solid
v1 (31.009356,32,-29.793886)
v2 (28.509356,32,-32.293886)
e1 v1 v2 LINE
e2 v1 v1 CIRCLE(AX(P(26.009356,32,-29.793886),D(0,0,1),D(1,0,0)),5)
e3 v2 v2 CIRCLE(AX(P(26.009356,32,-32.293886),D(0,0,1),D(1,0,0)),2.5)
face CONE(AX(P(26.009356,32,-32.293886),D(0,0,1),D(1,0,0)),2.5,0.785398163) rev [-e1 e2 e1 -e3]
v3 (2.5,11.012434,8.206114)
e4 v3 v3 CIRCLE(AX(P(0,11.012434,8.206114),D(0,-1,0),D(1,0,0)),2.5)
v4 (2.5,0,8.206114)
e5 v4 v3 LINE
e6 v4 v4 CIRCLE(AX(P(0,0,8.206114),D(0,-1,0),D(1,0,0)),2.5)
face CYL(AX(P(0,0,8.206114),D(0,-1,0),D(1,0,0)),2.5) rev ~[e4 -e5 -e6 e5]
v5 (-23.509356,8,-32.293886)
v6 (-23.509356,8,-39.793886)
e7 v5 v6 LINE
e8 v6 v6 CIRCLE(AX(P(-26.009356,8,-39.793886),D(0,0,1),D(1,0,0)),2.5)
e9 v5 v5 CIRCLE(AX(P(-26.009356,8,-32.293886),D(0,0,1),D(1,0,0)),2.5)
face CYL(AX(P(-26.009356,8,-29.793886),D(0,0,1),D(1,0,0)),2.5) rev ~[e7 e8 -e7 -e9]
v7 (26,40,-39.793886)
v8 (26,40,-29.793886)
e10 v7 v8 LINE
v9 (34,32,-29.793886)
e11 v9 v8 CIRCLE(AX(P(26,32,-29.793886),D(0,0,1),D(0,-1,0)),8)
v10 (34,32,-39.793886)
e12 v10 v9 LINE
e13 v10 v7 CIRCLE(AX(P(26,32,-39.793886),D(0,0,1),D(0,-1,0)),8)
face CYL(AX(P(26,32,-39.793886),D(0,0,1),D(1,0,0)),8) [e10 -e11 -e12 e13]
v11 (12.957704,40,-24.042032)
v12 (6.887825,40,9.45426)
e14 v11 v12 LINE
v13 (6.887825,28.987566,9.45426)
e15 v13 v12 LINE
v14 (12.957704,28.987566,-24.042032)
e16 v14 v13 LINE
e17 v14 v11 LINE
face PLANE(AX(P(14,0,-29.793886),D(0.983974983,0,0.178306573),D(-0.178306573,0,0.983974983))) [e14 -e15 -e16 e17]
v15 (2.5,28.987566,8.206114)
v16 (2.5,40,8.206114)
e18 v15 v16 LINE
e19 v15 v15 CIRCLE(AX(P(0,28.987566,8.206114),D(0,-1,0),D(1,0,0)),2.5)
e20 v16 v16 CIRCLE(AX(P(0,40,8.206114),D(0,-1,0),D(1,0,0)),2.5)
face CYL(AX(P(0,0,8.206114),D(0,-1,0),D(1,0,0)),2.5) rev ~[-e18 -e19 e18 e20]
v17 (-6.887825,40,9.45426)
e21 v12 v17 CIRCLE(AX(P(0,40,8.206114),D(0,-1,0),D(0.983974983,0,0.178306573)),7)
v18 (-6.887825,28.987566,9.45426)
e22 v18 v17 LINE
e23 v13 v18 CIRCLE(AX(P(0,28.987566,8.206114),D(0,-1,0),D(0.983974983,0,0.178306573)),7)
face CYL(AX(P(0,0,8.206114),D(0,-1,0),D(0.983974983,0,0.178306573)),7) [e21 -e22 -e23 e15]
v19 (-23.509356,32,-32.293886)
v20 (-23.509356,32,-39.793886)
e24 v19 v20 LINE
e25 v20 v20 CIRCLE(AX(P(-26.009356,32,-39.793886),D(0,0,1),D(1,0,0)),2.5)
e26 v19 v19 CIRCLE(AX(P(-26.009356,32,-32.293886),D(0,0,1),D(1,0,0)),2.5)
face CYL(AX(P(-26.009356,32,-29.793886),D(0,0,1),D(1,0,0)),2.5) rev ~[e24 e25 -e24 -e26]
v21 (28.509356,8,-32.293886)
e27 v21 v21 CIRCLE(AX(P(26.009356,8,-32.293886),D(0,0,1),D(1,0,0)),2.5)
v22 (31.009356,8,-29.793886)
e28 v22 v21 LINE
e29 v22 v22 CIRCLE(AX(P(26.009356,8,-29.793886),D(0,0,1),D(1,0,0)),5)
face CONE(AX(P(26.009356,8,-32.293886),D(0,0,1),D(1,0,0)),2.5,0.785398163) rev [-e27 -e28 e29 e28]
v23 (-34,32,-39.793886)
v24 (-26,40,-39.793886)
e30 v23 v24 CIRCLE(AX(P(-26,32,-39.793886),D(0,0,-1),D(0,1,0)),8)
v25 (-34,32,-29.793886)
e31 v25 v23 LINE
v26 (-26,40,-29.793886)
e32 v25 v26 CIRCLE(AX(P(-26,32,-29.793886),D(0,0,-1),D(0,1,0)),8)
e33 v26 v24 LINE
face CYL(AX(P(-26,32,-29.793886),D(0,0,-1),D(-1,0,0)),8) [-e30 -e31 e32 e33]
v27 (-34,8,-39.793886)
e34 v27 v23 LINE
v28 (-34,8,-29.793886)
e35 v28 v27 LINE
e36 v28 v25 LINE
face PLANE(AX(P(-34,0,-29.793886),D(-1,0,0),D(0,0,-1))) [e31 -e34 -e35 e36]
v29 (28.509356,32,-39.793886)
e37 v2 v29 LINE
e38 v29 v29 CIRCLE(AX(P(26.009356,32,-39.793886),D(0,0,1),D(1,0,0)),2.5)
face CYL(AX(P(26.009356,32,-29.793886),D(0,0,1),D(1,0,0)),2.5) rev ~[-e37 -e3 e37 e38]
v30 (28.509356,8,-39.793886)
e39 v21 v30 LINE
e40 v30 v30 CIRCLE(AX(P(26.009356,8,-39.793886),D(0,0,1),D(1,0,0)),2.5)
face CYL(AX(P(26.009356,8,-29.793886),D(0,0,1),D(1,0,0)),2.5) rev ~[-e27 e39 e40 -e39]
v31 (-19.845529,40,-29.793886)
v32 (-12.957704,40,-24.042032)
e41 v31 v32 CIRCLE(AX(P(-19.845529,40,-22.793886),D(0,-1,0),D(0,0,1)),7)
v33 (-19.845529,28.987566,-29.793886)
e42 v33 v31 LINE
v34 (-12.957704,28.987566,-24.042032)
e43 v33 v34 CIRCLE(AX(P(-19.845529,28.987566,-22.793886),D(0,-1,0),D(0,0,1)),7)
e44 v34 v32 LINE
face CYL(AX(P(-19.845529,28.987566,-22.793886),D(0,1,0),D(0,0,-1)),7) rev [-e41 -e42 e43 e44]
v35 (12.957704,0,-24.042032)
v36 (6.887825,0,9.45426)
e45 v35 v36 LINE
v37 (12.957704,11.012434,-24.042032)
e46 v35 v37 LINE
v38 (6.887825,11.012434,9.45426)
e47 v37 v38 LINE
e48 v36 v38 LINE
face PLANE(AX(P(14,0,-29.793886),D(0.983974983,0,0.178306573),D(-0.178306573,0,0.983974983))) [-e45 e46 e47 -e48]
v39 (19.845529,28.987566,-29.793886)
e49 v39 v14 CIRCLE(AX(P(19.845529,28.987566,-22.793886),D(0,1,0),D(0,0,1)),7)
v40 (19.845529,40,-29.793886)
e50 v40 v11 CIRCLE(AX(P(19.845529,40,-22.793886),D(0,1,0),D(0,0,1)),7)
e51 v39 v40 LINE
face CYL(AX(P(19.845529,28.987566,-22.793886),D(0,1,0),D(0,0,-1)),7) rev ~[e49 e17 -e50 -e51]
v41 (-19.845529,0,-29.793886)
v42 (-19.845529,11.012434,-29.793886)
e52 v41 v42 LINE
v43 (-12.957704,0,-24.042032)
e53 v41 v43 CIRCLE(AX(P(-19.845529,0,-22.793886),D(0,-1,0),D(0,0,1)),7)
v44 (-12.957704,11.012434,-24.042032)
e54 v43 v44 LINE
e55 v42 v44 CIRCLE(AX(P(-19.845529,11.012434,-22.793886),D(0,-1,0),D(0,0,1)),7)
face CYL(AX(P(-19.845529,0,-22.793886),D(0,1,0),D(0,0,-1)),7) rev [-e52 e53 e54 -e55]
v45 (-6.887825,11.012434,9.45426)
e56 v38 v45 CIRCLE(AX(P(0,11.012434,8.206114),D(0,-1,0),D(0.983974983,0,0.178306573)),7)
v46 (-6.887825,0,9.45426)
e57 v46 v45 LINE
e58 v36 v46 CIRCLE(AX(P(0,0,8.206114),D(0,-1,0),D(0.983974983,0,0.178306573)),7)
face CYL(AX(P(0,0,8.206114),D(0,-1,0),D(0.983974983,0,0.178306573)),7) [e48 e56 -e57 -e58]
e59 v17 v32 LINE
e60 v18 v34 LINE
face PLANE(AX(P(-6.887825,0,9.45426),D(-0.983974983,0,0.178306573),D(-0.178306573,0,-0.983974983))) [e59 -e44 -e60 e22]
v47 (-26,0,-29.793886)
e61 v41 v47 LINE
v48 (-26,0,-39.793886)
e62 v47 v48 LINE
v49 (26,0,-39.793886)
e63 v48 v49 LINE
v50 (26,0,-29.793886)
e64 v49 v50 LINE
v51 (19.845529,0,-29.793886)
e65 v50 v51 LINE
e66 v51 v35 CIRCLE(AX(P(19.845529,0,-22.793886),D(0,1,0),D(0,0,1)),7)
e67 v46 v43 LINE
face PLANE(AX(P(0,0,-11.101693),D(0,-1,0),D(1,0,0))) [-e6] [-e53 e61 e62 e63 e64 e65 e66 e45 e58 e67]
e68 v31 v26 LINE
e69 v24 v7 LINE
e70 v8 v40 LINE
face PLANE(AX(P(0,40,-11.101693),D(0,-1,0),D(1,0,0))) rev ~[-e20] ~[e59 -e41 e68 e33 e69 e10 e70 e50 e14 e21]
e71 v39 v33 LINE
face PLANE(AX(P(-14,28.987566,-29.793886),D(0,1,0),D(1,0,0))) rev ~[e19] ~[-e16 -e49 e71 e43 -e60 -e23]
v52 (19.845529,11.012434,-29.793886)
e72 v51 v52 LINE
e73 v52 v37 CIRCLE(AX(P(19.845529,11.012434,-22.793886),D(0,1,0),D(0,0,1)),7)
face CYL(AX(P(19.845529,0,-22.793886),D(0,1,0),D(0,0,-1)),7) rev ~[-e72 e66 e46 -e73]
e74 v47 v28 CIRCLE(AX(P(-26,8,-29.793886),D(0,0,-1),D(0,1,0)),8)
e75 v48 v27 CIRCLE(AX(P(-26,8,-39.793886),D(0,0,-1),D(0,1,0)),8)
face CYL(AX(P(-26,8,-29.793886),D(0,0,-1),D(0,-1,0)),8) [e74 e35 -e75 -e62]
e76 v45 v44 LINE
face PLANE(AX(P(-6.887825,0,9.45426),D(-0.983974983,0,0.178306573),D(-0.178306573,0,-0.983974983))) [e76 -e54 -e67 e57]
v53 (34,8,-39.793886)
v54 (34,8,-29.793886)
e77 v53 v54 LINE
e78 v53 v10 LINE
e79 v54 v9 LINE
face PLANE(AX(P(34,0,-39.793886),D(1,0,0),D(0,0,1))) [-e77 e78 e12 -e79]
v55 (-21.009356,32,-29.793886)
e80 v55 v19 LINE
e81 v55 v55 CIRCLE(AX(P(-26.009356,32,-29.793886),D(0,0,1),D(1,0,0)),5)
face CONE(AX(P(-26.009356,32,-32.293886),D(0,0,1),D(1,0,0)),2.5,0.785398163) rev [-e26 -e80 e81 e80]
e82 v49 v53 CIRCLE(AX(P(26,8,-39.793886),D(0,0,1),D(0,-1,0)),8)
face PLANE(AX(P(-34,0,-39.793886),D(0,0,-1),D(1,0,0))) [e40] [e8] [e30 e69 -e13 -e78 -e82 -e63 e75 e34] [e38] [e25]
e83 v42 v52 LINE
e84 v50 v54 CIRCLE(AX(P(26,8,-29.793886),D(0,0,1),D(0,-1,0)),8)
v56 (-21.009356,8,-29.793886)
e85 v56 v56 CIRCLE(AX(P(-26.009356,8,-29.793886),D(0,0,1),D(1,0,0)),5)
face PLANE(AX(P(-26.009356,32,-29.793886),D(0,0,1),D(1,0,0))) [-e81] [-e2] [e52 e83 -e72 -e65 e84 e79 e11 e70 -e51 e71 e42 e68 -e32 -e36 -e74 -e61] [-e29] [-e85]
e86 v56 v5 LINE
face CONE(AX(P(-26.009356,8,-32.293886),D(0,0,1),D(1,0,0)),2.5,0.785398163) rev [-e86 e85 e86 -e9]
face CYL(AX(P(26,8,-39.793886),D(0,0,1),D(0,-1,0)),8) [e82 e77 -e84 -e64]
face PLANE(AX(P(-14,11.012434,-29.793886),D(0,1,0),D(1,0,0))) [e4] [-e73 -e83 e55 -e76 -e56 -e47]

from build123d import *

# Parameters (mm, degrees)
F0_R      = 2.5
F1_DEPTH  = 40
F2_R      = 5
F2_R_2    = 2.5
F3_DEPTH  = 3
F4_W      = 32.6441857368
F4_H      = 17.9751312453
F5_DEPTH  = 50
F6_R      = 8
F9_R      = 7
F7_R      = 5
F7_R_2    = 2.5
F10_DEPTH = 3
F11_DEPTH = 25
F12_SIZE2 = 2.5
F12_SIZE  = 2.5


with BuildPart() as f1:
    # F0 (on Front) → F1 (new body)
    with BuildSketch(Plane.XZ):
        with BuildLine():
            Line((-6.8878248776, 9.4542597632), (-14, -29.7938862443))
            Line((-14, -29.7938862443), (14, -29.7938862443))
            Line((14, -29.7938862443), (6.8878248776, 9.4542597632))
            ThreePointArc((6.8878248776, 9.4542597632), (0, 15.2061137557), (-6.8878248776, 9.4542597632))
        make_face()
        with Locations((0, 8.2061137557)):
            Circle(F0_R, mode=Mode.SUBTRACT)
        Polygon((-34, -39.7938862443), (0, -39.7938862443), (34, -39.7938862443), (34, -29.7938862443), (14, -29.7938862443), (-14, -29.7938862443), (-34, -29.7938862443), align=None)
    extrude(amount=-F1_DEPTH)

    # F2 (on face) → F3 (cut)
    with BuildSketch(Plane.XY.offset(-29.7938862443)):
        with Locations((26.0093560517, 32)):
            Circle(F2_R)
        with Locations((26.0093560517, 32)):
            Circle(F2_R_2, mode=Mode.SUBTRACT)
        with Locations((-26.0093560517, 32)):
            Circle(F2_R)
        with Locations((-26.0093560517, 32)):
            Circle(F2_R_2, mode=Mode.SUBTRACT)
        with Locations((-26.0093560517, 8)):
            Circle(F2_R)
        with Locations((-26.0093560517, 8)):
            Circle(F2_R_2, mode=Mode.SUBTRACT)
        with Locations((26.0093560517, 8)):
            Circle(F2_R)
        with Locations((26.0093560517, 8)):
            Circle(F2_R_2, mode=Mode.SUBTRACT)
    extrude(amount=-F3_DEPTH, mode=Mode.SUBTRACT)

    # F4 (on face) → F5 (cut)
    with BuildSketch(Plane.XY.offset(-29.7938862443)):
        with Locations((2.3220928684, 20)):
            Rectangle(F4_W, F4_H)
    extrude(amount=F5_DEPTH, mode=Mode.SUBTRACT)

    # F6
    f6_edges = [f1.edges().sort_by_distance(p)[0] for p in [
        (-34, 0, -34.793886),
        (34, 0, -34.793886),
        (34, 40, -34.793886),
        (-34, 40, -34.793886),
    ]]
    fillet(f6_edges, radius=F6_R)

    # F9
    f9_edges = [f1.edges().sort_by_distance(p)[0] for p in [
        (-14, 5.506217, -29.793886),
        (-14, 34.493783, -29.793886),
        (14, 5.506217, -29.793886),
        (14, 34.493783, -29.793886),
    ]]
    fillet(f9_edges, radius=F9_R)

    # F7 (on face) → F10 (join)
    with BuildSketch(Plane.XY.offset(-32.7938862443)):
        with Locations((-26.0093560517, 32)):
            Circle(F7_R)
        with Locations((-26.0093560517, 32)):
            Circle(F7_R_2, mode=Mode.SUBTRACT)
        with Locations((26.0093560517, 32)):
            Circle(F7_R)
        with Locations((26.0093560517, 32)):
            Circle(F7_R_2, mode=Mode.SUBTRACT)
        with Locations((26.0093560517, 8)):
            Circle(F7_R)
        with Locations((26.0093560517, 8)):
            Circle(F7_R_2, mode=Mode.SUBTRACT)
        with Locations((-26.0093560517, 8)):
            Circle(F7_R)
        with Locations((-26.0093560517, 8)):
            Circle(F7_R_2, mode=Mode.SUBTRACT)
    extrude(amount=F10_DEPTH)

    # F2 (on face) → F11 (cut)
    with BuildSketch(Plane.XY.offset(-29.7938862443)):
        with Locations((-26.0093560517, 32)):
            Circle(F2_R_2)
        with Locations((-26.0093560517, 8)):
            Circle(F2_R_2)
        with Locations((26.0093560517, 8)):
            Circle(F2_R_2)
        with Locations((26.0093560517, 32)):
            Circle(F2_R_2)
    extrude(amount=-F11_DEPTH, mode=Mode.SUBTRACT)

    # F12
    f12_edges = [f1.edges().sort_by_distance(p)[0] for p in [
        (-28.509356, 32, -29.793886),
        (23.509356, 32, -29.793886),
        (23.509356, 8, -29.793886),
        (-28.509356, 8, -29.793886),
    ]]
    chamfer(f12_edges, length=F12_SIZE, length2=F12_SIZE2)


solid = f1.part
